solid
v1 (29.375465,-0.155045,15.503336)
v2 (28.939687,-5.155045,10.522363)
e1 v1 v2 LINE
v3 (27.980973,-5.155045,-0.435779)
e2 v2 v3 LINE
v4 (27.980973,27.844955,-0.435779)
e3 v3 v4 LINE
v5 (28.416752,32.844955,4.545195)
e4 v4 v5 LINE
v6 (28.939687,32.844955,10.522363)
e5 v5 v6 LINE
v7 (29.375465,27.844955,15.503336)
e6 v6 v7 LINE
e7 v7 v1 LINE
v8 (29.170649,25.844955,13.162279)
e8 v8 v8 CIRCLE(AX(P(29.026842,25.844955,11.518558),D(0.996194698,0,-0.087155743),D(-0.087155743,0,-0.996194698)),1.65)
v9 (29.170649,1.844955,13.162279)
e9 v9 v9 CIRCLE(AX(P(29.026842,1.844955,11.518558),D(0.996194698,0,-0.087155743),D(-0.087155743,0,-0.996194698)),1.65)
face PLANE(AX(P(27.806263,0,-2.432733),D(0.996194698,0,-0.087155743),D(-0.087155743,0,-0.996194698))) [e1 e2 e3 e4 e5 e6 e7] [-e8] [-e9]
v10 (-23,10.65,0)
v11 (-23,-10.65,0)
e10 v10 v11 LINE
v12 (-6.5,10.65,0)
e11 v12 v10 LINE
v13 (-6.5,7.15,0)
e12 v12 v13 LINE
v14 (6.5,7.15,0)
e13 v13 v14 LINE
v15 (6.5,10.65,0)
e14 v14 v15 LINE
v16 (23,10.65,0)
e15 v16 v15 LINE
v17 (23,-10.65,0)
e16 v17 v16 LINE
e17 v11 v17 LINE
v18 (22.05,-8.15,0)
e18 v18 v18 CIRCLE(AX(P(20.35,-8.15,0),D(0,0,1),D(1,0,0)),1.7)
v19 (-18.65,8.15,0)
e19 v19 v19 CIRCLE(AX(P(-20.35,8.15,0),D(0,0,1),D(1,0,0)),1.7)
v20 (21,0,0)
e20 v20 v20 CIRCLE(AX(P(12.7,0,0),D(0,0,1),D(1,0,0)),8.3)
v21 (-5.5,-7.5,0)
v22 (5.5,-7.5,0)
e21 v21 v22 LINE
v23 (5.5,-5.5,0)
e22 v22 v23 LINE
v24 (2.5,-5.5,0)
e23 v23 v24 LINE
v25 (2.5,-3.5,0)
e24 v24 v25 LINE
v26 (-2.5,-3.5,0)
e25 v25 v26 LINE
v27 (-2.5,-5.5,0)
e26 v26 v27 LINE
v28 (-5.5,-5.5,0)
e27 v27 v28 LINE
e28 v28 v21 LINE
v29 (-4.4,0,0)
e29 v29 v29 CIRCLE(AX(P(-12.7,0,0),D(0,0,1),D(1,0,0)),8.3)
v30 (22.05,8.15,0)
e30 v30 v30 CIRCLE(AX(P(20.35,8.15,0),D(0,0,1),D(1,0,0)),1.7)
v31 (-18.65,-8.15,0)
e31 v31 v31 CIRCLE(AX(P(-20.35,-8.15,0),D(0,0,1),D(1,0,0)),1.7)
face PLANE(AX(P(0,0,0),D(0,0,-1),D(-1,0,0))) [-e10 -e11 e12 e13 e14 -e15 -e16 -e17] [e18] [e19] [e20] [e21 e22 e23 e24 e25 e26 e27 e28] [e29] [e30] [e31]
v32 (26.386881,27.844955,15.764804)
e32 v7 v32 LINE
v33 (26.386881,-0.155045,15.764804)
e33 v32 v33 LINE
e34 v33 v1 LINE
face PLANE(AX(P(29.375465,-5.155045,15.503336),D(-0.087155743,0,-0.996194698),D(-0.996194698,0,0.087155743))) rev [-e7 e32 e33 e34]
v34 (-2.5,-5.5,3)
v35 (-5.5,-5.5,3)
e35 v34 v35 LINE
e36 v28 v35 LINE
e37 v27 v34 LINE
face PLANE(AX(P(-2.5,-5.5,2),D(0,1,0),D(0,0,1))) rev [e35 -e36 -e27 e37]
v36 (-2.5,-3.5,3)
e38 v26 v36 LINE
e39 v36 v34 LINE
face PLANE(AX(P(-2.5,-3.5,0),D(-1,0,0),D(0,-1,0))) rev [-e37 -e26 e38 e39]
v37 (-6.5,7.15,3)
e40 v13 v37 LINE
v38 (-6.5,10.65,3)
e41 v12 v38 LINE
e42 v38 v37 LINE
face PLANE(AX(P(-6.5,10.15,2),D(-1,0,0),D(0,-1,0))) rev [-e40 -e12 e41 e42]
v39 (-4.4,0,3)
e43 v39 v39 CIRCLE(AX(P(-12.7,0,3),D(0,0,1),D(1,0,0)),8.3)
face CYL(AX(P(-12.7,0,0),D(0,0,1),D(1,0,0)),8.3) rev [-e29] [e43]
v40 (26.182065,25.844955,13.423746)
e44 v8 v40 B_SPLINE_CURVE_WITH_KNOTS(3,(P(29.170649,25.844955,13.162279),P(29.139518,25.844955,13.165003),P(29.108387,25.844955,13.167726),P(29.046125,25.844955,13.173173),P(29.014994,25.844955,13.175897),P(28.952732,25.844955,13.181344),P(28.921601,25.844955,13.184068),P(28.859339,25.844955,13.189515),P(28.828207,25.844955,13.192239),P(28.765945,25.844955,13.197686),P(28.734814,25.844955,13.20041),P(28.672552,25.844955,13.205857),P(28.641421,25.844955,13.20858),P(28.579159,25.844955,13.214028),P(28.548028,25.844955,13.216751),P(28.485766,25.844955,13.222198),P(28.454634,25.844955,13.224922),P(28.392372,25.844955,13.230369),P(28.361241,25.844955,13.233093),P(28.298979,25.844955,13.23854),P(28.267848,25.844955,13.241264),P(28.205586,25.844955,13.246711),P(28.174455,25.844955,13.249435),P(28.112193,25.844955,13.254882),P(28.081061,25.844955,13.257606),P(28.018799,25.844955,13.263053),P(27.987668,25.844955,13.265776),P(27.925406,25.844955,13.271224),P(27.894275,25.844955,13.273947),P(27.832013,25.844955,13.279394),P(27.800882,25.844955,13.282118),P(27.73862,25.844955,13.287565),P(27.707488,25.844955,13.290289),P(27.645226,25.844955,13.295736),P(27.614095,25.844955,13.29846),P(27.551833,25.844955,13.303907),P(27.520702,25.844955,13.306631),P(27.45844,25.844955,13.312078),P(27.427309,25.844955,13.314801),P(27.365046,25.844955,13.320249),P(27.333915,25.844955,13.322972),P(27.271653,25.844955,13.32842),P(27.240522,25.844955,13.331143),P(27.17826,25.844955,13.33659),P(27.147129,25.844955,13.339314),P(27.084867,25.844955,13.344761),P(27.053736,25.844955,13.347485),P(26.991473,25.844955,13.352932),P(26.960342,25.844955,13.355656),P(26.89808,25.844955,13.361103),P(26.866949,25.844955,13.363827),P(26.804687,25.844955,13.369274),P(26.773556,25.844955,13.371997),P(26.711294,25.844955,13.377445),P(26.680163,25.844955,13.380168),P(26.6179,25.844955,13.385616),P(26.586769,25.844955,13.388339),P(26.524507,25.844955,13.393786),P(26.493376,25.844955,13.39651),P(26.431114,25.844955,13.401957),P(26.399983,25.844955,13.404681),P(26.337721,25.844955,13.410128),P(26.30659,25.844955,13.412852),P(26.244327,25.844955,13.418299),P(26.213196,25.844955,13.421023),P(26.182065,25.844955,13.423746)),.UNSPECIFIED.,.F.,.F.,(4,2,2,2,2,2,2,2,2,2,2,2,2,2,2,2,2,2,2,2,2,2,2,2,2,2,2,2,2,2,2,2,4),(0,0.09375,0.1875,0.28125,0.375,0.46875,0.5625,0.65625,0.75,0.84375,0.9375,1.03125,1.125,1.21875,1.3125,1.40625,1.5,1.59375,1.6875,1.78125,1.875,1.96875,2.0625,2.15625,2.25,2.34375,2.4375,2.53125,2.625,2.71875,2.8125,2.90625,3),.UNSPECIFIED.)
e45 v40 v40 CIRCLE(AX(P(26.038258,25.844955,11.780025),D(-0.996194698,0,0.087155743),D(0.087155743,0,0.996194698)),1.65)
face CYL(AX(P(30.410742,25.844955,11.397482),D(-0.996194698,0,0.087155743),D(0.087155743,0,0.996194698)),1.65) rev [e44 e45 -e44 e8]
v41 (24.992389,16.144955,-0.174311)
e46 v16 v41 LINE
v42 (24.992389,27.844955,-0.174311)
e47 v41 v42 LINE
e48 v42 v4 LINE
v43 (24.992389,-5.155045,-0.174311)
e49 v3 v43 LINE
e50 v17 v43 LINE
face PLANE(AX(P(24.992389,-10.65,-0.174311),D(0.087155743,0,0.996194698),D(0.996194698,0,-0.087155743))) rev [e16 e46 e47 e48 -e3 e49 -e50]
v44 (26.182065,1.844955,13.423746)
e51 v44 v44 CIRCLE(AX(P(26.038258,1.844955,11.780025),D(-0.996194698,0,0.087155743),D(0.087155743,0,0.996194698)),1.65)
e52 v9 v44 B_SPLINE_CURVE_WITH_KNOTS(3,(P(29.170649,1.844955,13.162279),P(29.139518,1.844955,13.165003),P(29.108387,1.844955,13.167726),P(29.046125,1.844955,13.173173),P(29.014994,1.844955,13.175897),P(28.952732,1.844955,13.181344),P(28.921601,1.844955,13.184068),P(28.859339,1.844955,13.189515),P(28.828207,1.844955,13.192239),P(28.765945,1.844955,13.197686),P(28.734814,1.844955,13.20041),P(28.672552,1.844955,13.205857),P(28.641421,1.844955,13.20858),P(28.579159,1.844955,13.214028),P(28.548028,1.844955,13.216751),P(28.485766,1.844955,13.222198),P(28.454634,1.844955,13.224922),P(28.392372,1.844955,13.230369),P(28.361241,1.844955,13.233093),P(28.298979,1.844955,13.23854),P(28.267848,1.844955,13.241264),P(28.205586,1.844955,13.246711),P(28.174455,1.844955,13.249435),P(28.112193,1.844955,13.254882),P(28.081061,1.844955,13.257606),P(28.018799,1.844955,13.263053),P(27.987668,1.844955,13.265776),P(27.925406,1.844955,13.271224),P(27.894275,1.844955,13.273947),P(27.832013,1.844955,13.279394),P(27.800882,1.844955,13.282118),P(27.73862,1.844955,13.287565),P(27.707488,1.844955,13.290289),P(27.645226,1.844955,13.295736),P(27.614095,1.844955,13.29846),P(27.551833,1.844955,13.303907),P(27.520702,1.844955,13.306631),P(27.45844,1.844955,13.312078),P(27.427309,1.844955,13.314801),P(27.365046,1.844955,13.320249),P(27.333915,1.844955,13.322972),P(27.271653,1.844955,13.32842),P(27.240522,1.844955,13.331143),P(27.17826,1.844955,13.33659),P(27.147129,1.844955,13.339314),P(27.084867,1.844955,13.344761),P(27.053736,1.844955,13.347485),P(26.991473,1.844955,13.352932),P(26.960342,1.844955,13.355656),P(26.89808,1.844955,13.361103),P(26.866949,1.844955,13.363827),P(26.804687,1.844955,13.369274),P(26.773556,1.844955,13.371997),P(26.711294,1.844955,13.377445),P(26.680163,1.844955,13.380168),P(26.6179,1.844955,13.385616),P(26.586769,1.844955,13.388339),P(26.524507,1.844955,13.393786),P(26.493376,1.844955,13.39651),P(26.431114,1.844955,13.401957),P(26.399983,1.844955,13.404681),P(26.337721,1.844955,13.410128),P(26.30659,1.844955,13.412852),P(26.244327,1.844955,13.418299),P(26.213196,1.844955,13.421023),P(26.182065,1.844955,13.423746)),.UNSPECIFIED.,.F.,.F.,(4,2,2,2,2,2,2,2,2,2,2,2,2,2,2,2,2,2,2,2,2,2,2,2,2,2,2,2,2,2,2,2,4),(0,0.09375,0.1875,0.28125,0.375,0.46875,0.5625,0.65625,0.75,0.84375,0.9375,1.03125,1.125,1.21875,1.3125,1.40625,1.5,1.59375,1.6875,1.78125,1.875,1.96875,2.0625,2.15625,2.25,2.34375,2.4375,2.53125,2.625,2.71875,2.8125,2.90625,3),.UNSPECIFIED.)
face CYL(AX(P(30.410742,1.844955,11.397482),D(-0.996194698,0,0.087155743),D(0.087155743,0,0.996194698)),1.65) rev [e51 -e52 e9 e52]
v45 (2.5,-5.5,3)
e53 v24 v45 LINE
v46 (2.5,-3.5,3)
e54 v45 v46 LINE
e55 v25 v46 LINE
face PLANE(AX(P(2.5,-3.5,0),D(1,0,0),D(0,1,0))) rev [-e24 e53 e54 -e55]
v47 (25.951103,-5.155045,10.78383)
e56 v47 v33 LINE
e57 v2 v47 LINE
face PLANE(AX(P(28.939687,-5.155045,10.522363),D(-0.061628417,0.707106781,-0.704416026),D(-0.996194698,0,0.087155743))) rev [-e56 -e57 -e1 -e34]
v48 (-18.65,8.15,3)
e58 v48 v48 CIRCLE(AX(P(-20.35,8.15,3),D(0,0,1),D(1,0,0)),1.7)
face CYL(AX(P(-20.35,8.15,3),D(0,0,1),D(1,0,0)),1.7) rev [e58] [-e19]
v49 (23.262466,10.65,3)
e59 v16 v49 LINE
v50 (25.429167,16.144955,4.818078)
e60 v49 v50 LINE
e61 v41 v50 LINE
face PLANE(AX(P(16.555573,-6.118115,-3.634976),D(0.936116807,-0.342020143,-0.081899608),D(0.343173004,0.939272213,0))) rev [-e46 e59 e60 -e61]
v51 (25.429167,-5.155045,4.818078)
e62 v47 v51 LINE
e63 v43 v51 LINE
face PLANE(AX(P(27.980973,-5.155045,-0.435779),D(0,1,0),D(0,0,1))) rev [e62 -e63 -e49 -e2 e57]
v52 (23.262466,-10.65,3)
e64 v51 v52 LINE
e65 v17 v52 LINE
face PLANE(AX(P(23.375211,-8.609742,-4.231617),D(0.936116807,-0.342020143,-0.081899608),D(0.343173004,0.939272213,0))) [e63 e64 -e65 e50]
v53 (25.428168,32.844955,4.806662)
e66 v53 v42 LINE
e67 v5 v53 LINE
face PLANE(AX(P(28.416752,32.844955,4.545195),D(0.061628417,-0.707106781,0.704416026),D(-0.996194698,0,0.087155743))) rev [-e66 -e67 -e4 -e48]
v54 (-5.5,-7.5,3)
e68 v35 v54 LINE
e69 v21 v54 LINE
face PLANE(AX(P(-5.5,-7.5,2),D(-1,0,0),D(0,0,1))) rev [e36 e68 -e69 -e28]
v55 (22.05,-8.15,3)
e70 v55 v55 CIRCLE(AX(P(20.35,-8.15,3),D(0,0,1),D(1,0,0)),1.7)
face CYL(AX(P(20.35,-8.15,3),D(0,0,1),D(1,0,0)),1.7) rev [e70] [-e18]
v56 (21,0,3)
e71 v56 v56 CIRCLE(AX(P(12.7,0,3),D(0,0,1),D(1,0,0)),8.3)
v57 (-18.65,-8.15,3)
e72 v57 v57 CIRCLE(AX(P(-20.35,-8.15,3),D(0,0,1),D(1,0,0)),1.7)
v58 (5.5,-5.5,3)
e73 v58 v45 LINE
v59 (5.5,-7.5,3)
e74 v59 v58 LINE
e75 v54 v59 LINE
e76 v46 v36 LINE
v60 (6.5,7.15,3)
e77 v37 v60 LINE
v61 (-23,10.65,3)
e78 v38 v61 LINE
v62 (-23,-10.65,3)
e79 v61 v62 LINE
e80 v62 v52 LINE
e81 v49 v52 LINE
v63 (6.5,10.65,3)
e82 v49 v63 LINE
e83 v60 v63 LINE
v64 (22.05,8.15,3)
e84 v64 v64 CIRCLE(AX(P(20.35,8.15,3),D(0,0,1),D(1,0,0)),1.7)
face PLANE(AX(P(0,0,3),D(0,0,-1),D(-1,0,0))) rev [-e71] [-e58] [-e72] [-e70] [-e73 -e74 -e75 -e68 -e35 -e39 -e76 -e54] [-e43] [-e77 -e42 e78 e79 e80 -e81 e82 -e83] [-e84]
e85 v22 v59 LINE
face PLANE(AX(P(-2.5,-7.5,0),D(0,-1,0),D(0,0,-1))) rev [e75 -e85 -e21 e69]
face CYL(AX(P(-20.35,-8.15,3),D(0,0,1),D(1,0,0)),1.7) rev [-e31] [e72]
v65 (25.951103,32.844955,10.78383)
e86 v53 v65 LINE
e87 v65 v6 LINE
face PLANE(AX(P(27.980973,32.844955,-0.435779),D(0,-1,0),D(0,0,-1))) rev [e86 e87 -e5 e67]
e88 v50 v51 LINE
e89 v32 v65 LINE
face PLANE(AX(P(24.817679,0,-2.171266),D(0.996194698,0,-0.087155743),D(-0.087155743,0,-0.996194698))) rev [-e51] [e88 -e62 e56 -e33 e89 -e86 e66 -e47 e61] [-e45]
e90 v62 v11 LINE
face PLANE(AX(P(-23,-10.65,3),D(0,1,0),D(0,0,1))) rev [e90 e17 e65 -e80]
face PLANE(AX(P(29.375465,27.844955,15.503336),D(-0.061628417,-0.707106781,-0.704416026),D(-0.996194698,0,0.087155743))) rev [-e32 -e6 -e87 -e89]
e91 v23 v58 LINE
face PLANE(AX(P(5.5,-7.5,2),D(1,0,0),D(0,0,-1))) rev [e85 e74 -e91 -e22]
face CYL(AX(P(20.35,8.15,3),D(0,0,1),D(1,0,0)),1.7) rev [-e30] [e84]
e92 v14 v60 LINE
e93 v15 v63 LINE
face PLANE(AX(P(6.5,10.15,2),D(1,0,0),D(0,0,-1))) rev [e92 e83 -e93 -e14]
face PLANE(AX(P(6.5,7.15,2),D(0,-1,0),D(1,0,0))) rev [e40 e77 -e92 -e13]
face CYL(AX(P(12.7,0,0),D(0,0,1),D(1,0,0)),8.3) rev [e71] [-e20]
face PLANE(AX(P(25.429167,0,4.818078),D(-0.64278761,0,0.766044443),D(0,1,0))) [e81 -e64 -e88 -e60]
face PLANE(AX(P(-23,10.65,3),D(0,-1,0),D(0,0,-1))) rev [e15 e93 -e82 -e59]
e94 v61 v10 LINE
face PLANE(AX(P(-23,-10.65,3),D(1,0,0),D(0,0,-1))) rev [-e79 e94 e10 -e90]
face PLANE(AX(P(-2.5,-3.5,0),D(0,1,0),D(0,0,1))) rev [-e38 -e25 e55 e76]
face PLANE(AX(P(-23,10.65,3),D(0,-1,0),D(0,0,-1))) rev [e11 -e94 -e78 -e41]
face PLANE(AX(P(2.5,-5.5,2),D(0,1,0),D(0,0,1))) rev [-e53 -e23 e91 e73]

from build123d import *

# Parameters (mm, degrees)
SKETCH_1_W          = 46
SKETCH_1_H          = 21.3
EXTRUDE_1_DEPTH     = 3
SKETCH_2_R          = 8.3
CUT_EXTRUDE_1_DEPTH = 26.522979842
SKETCH_3_W          = 8
SKETCH_3_H          = 3
CUT_EXTRUDE_2_DEPTH = 26.522979842
SKETCH_4_W          = 5
SKETCH_4_H          = 4
CUT_EXTRUDE_3_DEPTH = 26.522979842
SKETCH_5_W          = 3
SKETCH_5_H          = 2
SKETCH_5_W_2        = 2
SKETCH_5_H_2        = 3
CUT_EXTRUDE_4_DEPTH = 1
HOLE_WIZARD_M3_1_D  = 3.4
SKETCH4_W           = 11
SKETCH4_H           = 2
SKETCH4_W_2         = 13
SKETCH4_H_2         = 3.5
CUT_EXTRUDE3_DEPTH  = 26.522979842
BOSS_EXTRUDE2_DEPTH = 21.3
SKETCH7_W           = 3.011459513
SKETCH7_H           = 21.3
BOSS_EXTRUDE3_DEPTH = 2
SKETCH10_W          = 2
SKETCH10_H          = 28.7
BOSS_EXTRUDE5_DEPTH = 3.011459513
CUT_EXTRUDE6_DEPTH  = 47.808991188
SKETCH14_W          = 16
SKETCH14_H          = 38
BOSS_EXTRUDE8_DEPTH = 3
CHAMFER2_SIZE       = 2
SKETCH15_R          = 1.65
CUT_EXTRUDE7_DEPTH  = 61.720869721
CHAMFER3_SIZE       = 5


with BuildPart() as part:
    # 草圖1 → 填料-伸長1 (new body)
    with BuildSketch(Plane.XY):
        Rectangle(SKETCH_1_W, SKETCH_1_H)
    extrude(amount=EXTRUDE_1_DEPTH)

    # 草圖2 → 除料-伸長1 (cut, through all)
    with BuildSketch(Plane.XY.offset(3)):
        with Locations((-12.7, 0)):
            Circle(SKETCH_2_R)
        with Locations((12.7, 0)):
            Circle(SKETCH_2_R)
    extrude(amount=-CUT_EXTRUDE_1_DEPTH, mode=Mode.SUBTRACT)

    # 草圖3 → 除料-伸長2 (cut, through all)
    with BuildSketch(Plane.XY.offset(3)):
        with Locations((0, 9.15)):
            Rectangle(SKETCH_3_W, SKETCH_3_H)
    extrude(amount=-CUT_EXTRUDE_2_DEPTH, mode=Mode.SUBTRACT)

    # 草圖4 → 除料-伸長3 (cut, through all)
    with BuildSketch(Plane.XY.offset(3)):
        with Locations((0, -5.5)):
            Rectangle(SKETCH_4_W, SKETCH_4_H)
    extrude(amount=-CUT_EXTRUDE_3_DEPTH, mode=Mode.SUBTRACT)

    # 草圖5 → 除料-伸長4 (cut)
    with BuildSketch(Plane.XY.offset(3)):
        with Locations((4, -6.5)):
            Rectangle(SKETCH_5_W, SKETCH_5_H)
        with Locations((-5.5, 8.65)):
            Rectangle(SKETCH_5_W_2, SKETCH_5_H_2)
        with Locations((5.5, 8.65)):
            Rectangle(SKETCH_5_W_2, SKETCH_5_H_2)
        with Locations((-4, -6.5)):
            Rectangle(SKETCH_5_W, SKETCH_5_H)
    extrude(amount=-CUT_EXTRUDE_4_DEPTH, mode=Mode.SUBTRACT)

    # M3 餘隙孔1 (through all)
    with Locations(Plane.XY.offset(3)):
        with Locations((20.35, 8.15), (-20.35, -8.15), (-20.35, 8.15), (20.35, -8.15)):
            Hole(HOLE_WIZARD_M3_1_D / 2)

    # Sketch4 → Cut-Extrude3 (cut, through all)
    with BuildSketch(Plane.XY.offset(3)):
        with Locations((0, -6.5)):
            Rectangle(SKETCH4_W, SKETCH4_H)
        with Locations((0, 8.9)):
            Rectangle(SKETCH4_W_2, SKETCH4_H_2)
    extrude(amount=-CUT_EXTRUDE3_DEPTH, mode=Mode.SUBTRACT)

    # Sketch5 → Boss-Extrude2 (add)
    with BuildSketch(Plane(origin=(0, -10.65, 0), x_dir=(-1, 0, 0), z_dir=(0, -1, 0))):
        Polygon((-23, 0), (-23, -3), (-23.262465991, -3), align=None)
    extrude(amount=-BOSS_EXTRUDE2_DEPTH)

    # Sketch7 → Boss-Extrude3 (add)
    with BuildSketch(Plane(origin=(22.82528916, 0, -1.996954043), x_dir=(-0.08715574274765041, 0, -0.9961946980917462), z_dir=(0.9961946980917462, 0, -0.08715574274765041))):
        with Locations((-3.510311839, 0)):
            Rectangle(SKETCH7_W, SKETCH7_H)
    extrude(amount=BOSS_EXTRUDE3_DEPTH)

    # Sketch10 → Boss-Extrude5 (add)
    with BuildSketch(Plane(origin=(0.437176831, 0, 4.996954043), x_dir=(0.9961946980917463, 0, -0.08715574274765044), z_dir=(0.08715574274765044, 0, 0.9961946980917463))):
        with Locations((23.912478056, 25)):
            Rectangle(SKETCH10_W, SKETCH10_H)
    extrude(amount=-BOSS_EXTRUDE5_DEPTH)

    # Sketch12 → Cut-Extrude6 (cut, through all)
    with BuildSketch(Plane(origin=(0.437176831, 0, 4.996954043), x_dir=(0.9961946980917463, 0, -0.08715574274765044), z_dir=(0.08715574274765044, 0, 0.9961946980917463))):
        Polygon((24.912478056, -5.155045161), (22.912478056, -10.65), (24.912478056, -10.65), align=None)
        Polygon((22.912478056, 39.35), (22.912478056, 10.65), (24.912478056, 16.144954839), (24.912478056, 39.35), align=None)
    extrude(amount=-CUT_EXTRUDE6_DEPTH, mode=Mode.SUBTRACT)

    # Sketch14 → Boss-Extrude8 (add)
    with BuildSketch(Plane(origin=(24.817678556, 0, -2.171265529), x_dir=(-0.08715574274765041, 0, -0.9961946980917462), z_dir=(0.9961946980917462, 0, -0.08715574274765041))):
        with Locations((-10.004582083, 13.844954839)):
            Rectangle(SKETCH14_W, SKETCH14_H)
    extrude(amount=BOSS_EXTRUDE8_DEPTH)

    # Chamfer2
    chamfer2_edges = [part.edges().sort_by_distance(p)[0] for p in [
        (25.254855387, 5.494954839, 2.825688515),
    ]]
    chamfer(chamfer2_edges, length=CHAMFER2_SIZE - 0.0001)  # a hair under: the kernel refuses the full size

    # Sketch15 → Cut-Extrude7 (cut, through all)
    with BuildSketch(Plane(origin=(24.817678556, 0, -2.171265529), x_dir=(0.08715574274765048, 0, 0.9961946980917462), z_dir=(-0.9961946980917462, 0, 0.08715574274765048))):
        with Locations((14.004582083, 25.844954839)):
            Circle(SKETCH15_R)
        with Locations((14.004582083, 1.844954839)):
            Circle(SKETCH15_R)
    extrude(amount=-CUT_EXTRUDE7_DEPTH, mode=Mode.SUBTRACT)

    # Chamfer3
    chamfer3_edges = [part.edges().sort_by_distance(p)[0] for p in [
        (26.486681443, 32.844954839, -0.3050451),
        (27.881173327, 32.844954839, 15.63407007),
        (27.881173327, -5.155045161, 15.63407007),
    ]]
    chamfer(chamfer3_edges, length=CHAMFER3_SIZE)


solid = part.part
